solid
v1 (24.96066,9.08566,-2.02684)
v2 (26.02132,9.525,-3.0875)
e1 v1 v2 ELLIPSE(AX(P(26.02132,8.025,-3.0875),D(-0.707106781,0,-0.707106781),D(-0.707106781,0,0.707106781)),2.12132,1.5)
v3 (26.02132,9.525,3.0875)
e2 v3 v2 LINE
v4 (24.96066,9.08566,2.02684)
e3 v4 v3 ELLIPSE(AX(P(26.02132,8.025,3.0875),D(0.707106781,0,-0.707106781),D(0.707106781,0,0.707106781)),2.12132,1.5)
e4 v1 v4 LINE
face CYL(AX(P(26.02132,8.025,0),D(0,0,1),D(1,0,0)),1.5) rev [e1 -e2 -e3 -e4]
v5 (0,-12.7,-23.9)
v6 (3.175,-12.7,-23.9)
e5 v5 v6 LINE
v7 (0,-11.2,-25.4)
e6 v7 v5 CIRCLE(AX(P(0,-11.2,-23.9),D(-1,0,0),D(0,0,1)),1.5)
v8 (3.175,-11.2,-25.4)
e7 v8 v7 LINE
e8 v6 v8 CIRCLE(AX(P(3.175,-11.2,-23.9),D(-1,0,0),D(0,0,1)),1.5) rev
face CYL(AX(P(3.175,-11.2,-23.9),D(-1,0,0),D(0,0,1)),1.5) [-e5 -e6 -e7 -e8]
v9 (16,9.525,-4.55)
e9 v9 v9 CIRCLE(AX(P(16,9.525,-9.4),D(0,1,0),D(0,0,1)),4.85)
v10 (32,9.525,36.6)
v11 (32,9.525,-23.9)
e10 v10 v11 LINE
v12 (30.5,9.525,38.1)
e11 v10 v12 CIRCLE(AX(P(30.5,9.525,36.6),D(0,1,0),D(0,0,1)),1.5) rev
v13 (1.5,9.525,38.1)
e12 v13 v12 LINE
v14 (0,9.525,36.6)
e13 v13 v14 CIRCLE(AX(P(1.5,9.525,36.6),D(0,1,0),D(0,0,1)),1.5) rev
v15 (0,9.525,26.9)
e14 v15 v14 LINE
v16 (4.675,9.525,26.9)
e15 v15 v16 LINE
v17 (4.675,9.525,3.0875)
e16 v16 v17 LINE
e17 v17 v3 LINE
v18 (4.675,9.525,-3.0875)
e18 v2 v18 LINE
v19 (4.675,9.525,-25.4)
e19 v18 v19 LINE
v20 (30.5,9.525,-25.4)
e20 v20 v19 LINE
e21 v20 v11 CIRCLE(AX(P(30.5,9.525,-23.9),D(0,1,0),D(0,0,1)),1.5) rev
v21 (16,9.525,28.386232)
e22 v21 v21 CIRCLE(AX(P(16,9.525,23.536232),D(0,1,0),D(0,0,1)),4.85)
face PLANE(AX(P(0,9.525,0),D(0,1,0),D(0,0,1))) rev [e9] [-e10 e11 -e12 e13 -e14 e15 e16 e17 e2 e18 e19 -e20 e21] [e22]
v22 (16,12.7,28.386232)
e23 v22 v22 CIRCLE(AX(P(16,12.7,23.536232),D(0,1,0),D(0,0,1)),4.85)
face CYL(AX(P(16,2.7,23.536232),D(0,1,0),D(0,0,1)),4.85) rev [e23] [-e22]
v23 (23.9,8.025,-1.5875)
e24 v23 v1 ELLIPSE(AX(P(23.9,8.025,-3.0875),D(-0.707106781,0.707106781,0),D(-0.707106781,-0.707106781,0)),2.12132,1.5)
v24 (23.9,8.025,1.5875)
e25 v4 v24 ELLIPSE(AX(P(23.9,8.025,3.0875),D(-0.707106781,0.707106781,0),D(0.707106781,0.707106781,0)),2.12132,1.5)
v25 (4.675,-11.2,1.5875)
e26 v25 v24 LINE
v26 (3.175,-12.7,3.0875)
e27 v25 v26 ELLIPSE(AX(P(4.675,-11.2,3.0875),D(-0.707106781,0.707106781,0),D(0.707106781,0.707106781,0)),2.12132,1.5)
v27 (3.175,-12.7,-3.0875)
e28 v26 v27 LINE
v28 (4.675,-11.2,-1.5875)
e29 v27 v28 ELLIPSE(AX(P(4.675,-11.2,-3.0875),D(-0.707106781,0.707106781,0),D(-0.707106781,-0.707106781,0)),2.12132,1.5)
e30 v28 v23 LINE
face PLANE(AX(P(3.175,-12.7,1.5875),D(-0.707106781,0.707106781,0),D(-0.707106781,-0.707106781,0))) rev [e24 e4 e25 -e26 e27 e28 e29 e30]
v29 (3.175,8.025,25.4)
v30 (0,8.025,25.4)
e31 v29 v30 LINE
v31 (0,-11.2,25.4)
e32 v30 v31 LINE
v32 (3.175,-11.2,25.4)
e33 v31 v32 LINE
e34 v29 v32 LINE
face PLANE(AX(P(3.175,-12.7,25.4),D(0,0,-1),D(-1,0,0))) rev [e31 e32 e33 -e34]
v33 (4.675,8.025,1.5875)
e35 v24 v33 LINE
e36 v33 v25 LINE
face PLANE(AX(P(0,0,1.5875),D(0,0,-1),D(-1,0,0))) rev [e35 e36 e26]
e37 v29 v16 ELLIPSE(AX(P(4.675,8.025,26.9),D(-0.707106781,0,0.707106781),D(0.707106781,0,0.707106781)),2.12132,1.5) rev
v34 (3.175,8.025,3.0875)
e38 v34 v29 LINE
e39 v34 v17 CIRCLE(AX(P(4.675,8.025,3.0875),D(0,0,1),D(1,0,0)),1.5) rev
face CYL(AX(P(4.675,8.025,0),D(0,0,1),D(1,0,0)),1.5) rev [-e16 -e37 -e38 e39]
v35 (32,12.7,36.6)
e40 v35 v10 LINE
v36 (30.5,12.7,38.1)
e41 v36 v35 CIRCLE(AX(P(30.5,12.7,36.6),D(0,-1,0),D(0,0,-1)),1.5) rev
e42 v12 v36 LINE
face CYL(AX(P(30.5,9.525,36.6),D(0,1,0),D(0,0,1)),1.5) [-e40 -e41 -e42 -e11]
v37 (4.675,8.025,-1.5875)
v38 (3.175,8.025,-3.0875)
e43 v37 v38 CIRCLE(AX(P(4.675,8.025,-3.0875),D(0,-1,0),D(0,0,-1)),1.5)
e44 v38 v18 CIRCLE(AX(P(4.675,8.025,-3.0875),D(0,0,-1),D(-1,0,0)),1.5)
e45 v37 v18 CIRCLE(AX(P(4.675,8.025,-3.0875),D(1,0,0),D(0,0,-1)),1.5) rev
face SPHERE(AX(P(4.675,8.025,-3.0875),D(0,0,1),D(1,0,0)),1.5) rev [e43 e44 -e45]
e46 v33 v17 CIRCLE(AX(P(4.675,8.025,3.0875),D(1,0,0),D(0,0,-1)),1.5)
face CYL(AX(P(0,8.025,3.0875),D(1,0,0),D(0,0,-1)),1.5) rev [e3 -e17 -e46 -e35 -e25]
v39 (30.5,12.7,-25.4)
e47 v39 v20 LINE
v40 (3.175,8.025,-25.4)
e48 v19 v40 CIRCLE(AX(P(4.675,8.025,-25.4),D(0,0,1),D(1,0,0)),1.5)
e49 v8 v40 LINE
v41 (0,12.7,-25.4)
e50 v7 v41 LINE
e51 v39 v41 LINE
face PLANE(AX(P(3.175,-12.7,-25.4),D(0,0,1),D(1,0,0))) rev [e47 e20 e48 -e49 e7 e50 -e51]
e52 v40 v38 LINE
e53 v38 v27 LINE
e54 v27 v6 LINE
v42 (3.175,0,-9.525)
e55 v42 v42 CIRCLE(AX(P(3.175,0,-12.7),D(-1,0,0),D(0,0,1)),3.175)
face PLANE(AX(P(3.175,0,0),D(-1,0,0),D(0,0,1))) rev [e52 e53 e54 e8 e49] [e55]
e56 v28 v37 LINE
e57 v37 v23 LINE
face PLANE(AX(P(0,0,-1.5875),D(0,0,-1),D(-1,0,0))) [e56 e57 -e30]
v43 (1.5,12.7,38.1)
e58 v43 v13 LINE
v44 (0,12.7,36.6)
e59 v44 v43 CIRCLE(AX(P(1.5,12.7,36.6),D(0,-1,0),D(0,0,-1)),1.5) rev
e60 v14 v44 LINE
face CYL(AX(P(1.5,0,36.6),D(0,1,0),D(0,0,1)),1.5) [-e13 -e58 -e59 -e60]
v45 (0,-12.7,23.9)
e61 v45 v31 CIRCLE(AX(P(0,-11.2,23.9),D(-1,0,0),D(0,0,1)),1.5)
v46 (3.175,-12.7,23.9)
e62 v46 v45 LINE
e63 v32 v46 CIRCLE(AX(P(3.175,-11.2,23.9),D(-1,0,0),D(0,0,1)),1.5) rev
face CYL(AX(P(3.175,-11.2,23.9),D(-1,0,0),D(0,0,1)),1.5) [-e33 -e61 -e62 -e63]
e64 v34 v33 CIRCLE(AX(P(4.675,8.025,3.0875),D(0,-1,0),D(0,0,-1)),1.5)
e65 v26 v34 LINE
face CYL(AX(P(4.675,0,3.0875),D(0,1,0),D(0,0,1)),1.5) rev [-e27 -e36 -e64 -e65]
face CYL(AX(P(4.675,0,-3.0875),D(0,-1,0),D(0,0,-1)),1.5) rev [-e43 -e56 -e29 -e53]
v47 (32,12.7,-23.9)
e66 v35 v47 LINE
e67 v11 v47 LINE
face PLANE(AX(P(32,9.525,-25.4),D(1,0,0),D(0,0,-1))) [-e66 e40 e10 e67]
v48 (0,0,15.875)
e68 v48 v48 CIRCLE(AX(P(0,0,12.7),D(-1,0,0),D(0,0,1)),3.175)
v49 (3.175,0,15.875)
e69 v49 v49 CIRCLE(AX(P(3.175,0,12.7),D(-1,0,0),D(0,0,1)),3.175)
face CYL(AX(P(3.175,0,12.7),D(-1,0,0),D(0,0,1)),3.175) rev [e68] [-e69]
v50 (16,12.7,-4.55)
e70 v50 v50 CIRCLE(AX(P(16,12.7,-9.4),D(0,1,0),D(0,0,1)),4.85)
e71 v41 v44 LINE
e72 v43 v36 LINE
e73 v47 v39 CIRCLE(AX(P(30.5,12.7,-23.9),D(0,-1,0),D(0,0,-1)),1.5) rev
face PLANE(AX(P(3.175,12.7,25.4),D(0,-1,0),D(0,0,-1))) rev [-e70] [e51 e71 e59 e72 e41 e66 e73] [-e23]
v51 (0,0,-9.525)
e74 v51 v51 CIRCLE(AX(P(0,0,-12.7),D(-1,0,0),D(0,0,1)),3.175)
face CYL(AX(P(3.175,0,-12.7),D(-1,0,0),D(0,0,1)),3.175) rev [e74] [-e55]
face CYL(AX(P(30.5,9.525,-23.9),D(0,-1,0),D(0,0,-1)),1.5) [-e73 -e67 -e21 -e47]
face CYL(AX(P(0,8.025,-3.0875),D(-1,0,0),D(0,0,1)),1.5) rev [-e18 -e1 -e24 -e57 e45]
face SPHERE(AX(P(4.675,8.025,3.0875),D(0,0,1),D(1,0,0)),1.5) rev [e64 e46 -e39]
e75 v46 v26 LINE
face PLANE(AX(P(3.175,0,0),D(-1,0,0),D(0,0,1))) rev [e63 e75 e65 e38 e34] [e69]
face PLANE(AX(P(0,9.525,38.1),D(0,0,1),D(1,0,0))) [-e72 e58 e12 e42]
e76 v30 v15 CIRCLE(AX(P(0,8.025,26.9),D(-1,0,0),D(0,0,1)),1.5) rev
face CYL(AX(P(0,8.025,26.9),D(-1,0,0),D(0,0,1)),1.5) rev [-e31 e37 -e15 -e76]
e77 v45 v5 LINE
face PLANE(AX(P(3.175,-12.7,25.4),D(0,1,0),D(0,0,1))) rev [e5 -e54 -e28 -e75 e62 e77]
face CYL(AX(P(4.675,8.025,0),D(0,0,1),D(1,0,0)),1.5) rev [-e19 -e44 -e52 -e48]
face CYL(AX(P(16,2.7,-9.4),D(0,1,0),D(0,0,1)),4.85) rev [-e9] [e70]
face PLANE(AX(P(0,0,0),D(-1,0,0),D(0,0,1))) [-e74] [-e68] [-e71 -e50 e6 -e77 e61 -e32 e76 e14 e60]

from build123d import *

# Parameters (mm, degrees)
SKETCH2_W           = 50.8
SKETCH2_H           = 25.4
BOSS_EXTRUDE1_DEPTH = 3.175
SKETCH4_W           = 32
SKETCH4_H           = 63.5
BOSS_EXTRUDE2_DEPTH = 3.175
SKETCH6_R           = 3.175
CUT_EXTRUDE2_DEPTH  = 3.175
BOSS_EXTRUDE3_DEPTH = 1.5875
SKETCH8_R           = 4.85
CUT_EXTRUDE3_DEPTH  = 10
FILLET3_R           = 1.5


with BuildPart() as part:
    # Sketch2 → Boss-Extrude1 (new body)
    with BuildSketch(Plane(origin=(0, 0, 0), x_dir=(0, 0, -1), z_dir=(1, 0, 0))):
        Rectangle(SKETCH2_W, SKETCH2_H)
    extrude(amount=BOSS_EXTRUDE1_DEPTH)

    # Sketch4 → Boss-Extrude2 (add)
    with BuildSketch(Plane(origin=(0, 12.7, 0), x_dir=(1, 0, 0), z_dir=(0, 1, 0))):
        with Locations((16, -6.35)):
            Rectangle(SKETCH4_W, SKETCH4_H)
    extrude(amount=-BOSS_EXTRUDE2_DEPTH)

    # Sketch6 → Cut-Extrude2 (cut)
    with BuildSketch(Plane.ZY):
        with Locations((-12.7, 0)):
            Circle(SKETCH6_R)
        with Locations((12.7, 0)):
            Circle(SKETCH6_R)
    extrude(amount=-CUT_EXTRUDE2_DEPTH, mode=Mode.SUBTRACT)

    # Sketch7 → Boss-Extrude3 (add, symmetric)
    with BuildSketch(Plane.XY):
        Polygon((3.175, -12.7), (25.4, 9.525), (3.175, 9.525), align=None)
    extrude(amount=BOSS_EXTRUDE3_DEPTH, both=True)

    # Sketch8 → Cut-Extrude3 (cut)
    with BuildSketch(Plane(origin=(0, 12.7, 0), x_dir=(1, 0, 0), z_dir=(0, 1, 0))):
        with Locations(Location((16, 9.4, 0), (0, 0, 270))):
            Circle(SKETCH8_R)
        with Locations(Location((16, -23.536231777, 0), (0, 0, 270))):
            Circle(SKETCH8_R)
    extrude(amount=-CUT_EXTRUDE3_DEPTH, mode=Mode.SUBTRACT)

    # Fillet3
    # the kernel refuses this fillet: 1.5 mm, written as the material it adds along each edge
    with BuildSketch(Plane(origin=(4.675, 8.025, 3.0875), x_dir=(0, 0, -1), z_dir=(-1, 0, 0))) as fillet3_piece_1_section:
        Polygon((0, 0), (FILLET3_R, 0), (FILLET3_R, -FILLET3_R), (0, -FILLET3_R), align=None)
    fillet3_piece_1 = extrude(amount=FILLET3_R, mode=Mode.PRIVATE)
    fillet3_piece_1 = fillet3_piece_1 - Plane(origin=(4.675, 8.025, 3.0875), x_dir=(0, -0.7071067811865475, 0.7071067811865475), z_dir=(-1, 0, 0)) * Sphere(FILLET3_R, mode=Mode.PRIVATE)
    add(fillet3_piece_1)
    with BuildSketch(Plane(origin=(4.675, 8.025, -3.0875), x_dir=(-1, 0, 0), z_dir=(0, 0, 1))) as fillet3_piece_2_section:
        Polygon((0, 0), (FILLET3_R, 0), (FILLET3_R, -FILLET3_R), (0, -FILLET3_R), align=None)
    fillet3_piece_2 = extrude(amount=FILLET3_R, mode=Mode.PRIVATE)
    fillet3_piece_2 = fillet3_piece_2 - Plane(origin=(4.675, 8.025, -3.0875), x_dir=(0.7071067811865475, -0.7071067811865475, 0), z_dir=(0, 0, 1)) * Sphere(FILLET3_R, mode=Mode.PRIVATE)
    add(fillet3_piece_2)
    with BuildSketch(Plane(origin=(3.175, 9.525, 25.4), x_dir=(0, -1, 0), z_dir=(-1, 0, 0))) as fillet3_piece_3:
        with BuildLine():
            CenterArc((FILLET3_R, FILLET3_R), FILLET3_R, 180, 90)
            Line((0, FILLET3_R), (0, 0))
            Line((0, 0), (FILLET3_R, 0))
        make_face()
    extrude(amount=3.175)
    with BuildSketch(Plane(origin=(3.175, 9.525, 25.4), x_dir=(0, -1, 0), z_dir=(0, 0, -1)), Plane(origin=(3.175, 9.525, -3.0875), x_dir=(0, -1, 0), z_dir=(0, 0, -1))) as fillet3_piece_4:
        with BuildLine():
            CenterArc((FILLET3_R, -FILLET3_R), FILLET3_R, 90, 90)
            Line((0, -FILLET3_R), (0, 0))
            Line((0, 0), (FILLET3_R, 0))
        make_face()
    extrude(amount=22.3125)
    with BuildSketch(Plane(origin=(29.15, 9.525, -1.5875), x_dir=(0, 0, -1), z_dir=(-1, 0, 0))) as fillet3_piece_5_section:
        with BuildLine():
            CenterArc((FILLET3_R, FILLET3_R), FILLET3_R, 180, 90)
            Line((0, FILLET3_R), (0, 0))
            Line((0, 0), (FILLET3_R, 0))
        make_face()
    fillet3_piece_5 = extrude(amount=24.475, mode=Mode.PRIVATE)
    fillet3_piece_5 = split(fillet3_piece_5, bisect_by=Plane(origin=(19.967902823, 4.092902823, -1.930123153), z_dir=(-0.707106781186549, 0.707106781186546, 0)), keep=Keep.TOP, mode=Mode.PRIVATE)
    add(fillet3_piece_5)
    with BuildSketch(Plane(origin=(25.4, 9.525, -1.5875), x_dir=(-0.7071067811865489, -0.7071067811865461, 0), z_dir=(0, 0, 1))) as fillet3_piece_6:
        with BuildLine():
            CenterArc((FILLET3_R * 0.414213562373, FILLET3_R), FILLET3_R, 225, 45)
            Line((-FILLET3_R * 0.292893218813, FILLET3_R * 0.292893218813), (0, 0))
            Line((0, 0), (FILLET3_R * 0.414213562373, 0))
        make_face()
    extrude(amount=3.175)
    with BuildSketch(Plane(origin=(3.175, 8.025, -1.5875), x_dir=(0, 0, -1), z_dir=(0, -1, 0))) as fillet3_piece_7_section:
        with BuildLine():
            CenterArc((FILLET3_R, FILLET3_R), FILLET3_R, 180, 90)
            Line((0, FILLET3_R), (0, 0))
            Line((0, 0), (FILLET3_R, 0))
        make_face()
    fillet3_piece_7 = extrude(amount=20.725, mode=Mode.PRIVATE)
    fillet3_piece_7 = split(fillet3_piece_7, bisect_by=Plane(origin=(8.60741784, -7.26758216, -1.930100054), z_dir=(-0.707106781186549, 0.707106781186546, 0)), keep=Keep.TOP, mode=Mode.PRIVATE)
    add(fillet3_piece_7)
    with BuildSketch(Plane(origin=(29.15, 9.525, 1.5875), x_dir=(0, 0, 1), z_dir=(-1, 0, 0))) as fillet3_piece_8_section:
        with BuildLine():
            CenterArc((FILLET3_R, -FILLET3_R), FILLET3_R, 90, 90)
            Line((0, -FILLET3_R), (0, 0))
            Line((0, 0), (FILLET3_R, 0))
        make_face()
    fillet3_piece_8 = extrude(amount=24.475, mode=Mode.PRIVATE)
    fillet3_piece_8 = split(fillet3_piece_8, bisect_by=Plane(origin=(19.967902823, 4.092902823, 1.930123153), z_dir=(-0.707106781186549, 0.707106781186546, 0)), keep=Keep.TOP, mode=Mode.PRIVATE)
    add(fillet3_piece_8)
    with BuildSketch(Plane(origin=(3.175, 8.025, 1.5875), x_dir=(0, 0, 1), z_dir=(0, -1, 0))) as fillet3_piece_9_section:
        with BuildLine():
            CenterArc((FILLET3_R, -FILLET3_R), FILLET3_R, 90, 90)
            Line((0, -FILLET3_R), (0, 0))
            Line((0, 0), (FILLET3_R, 0))
        make_face()
    fillet3_piece_9 = extrude(amount=20.725, mode=Mode.PRIVATE)
    fillet3_piece_9 = split(fillet3_piece_9, bisect_by=Plane(origin=(8.60741784, -7.26758216, 1.930100054), z_dir=(-0.707106781186549, 0.707106781186546, 0)), keep=Keep.TOP, mode=Mode.PRIVATE)
    add(fillet3_piece_9)
    with BuildSketch(Plane(origin=(6.925, 9.525, 25.4), x_dir=(0, -1, 0), z_dir=(-1, 0, 0))) as fillet3_piece_10a_section:
        with BuildLine():
            CenterArc((FILLET3_R, FILLET3_R), FILLET3_R, 180, 90)
            Line((0, FILLET3_R), (0, 0))
            Line((0, 0), (FILLET3_R, 0))
        make_face()
    fillet3_piece_10a = extrude(amount=6.925, mode=Mode.PRIVATE)
    fillet3_piece_10a = split(fillet3_piece_10a, bisect_by=Plane(origin=(3.175, 9.185407329, 25.739592671), z_dir=(1, 0, 0)), keep=Keep.TOP, mode=Mode.PRIVATE)
    with BuildSketch(Plane(origin=(3.175, 9.525, 29.15), x_dir=(0, -1, 0), z_dir=(0, 0, -1))) as fillet3_piece_10b_section:
        with BuildLine():
            CenterArc((FILLET3_R, -FILLET3_R), FILLET3_R, 90, 90)
            Line((0, -FILLET3_R), (0, 0))
            Line((0, 0), (FILLET3_R, 0))
        make_face()
    fillet3_piece_10b = extrude(amount=26.0625, mode=Mode.PRIVATE)
    fillet3_piece_10b = split(fillet3_piece_10b, bisect_by=Plane(origin=(3.514592671, 9.185407329, 25.4), z_dir=(0, 0, 1)), keep=Keep.TOP, mode=Mode.PRIVATE)
    fillet3_piece_10 = fillet3_piece_10a & fillet3_piece_10b
    add(fillet3_piece_10)
    with BuildSketch(Plane(origin=(25.4, 9.525, -3.140800859), x_dir=(-0.7071067811865446, -0.7071067811865503, 0), z_dir=(0, 0, 1))) as fillet3_piece_11a_section:
        with BuildLine():
            CenterArc((FILLET3_R * 0.414213562373, FILLET3_R), FILLET3_R, 225, 45)
            Line((-FILLET3_R * 0.292893218813, FILLET3_R * 0.292893218813), (0, 0))
            Line((0, 0), (FILLET3_R * 0.414213562373, 0))
        make_face()
    fillet3_piece_11a = extrude(amount=4.728300859, mode=Mode.PRIVATE)
    fillet3_piece_11a = split(fillet3_piece_11a, bisect_by=Plane(origin=(25.438403899, 9.432284787, -1.5875), z_dir=(0, 0, -1)), keep=Keep.TOP, mode=Mode.PRIVATE)
    with BuildSketch(Plane(origin=(29.15, 9.525, -1.5875), x_dir=(0, 0, -1), z_dir=(-1, 0, 0))) as fillet3_piece_11b_section:
        with BuildLine():
            CenterArc((FILLET3_R, FILLET3_R), FILLET3_R, 180, 90)
            Line((0, FILLET3_R), (0, 0))
            Line((0, 0), (FILLET3_R, 0))
        make_face()
    fillet3_piece_11b = extrude(amount=24.475, mode=Mode.PRIVATE)
    fillet3_piece_11b = split(fillet3_piece_11b, bisect_by=Plane(origin=(26.063627713, 10.188627713, -1.91198662), z_dir=(0.707106781186549, -0.707106781186546, 0)), keep=Keep.TOP, mode=Mode.PRIVATE)
    fillet3_piece_11 = fillet3_piece_11a & fillet3_piece_11b
    add(fillet3_piece_11)
    with BuildSketch(Plane(origin=(25.4, 9.525, -1.5875), x_dir=(-0.7071067811865489, -0.7071067811865461, 0), z_dir=(0, 0, 1))) as fillet3_piece_12a_section:
        with BuildLine():
            CenterArc((FILLET3_R * 0.414213562373, FILLET3_R), FILLET3_R, 225, 45)
            Line((-FILLET3_R * 0.292893218813, FILLET3_R * 0.292893218813), (0, 0))
            Line((0, 0), (FILLET3_R * 0.414213562373, 0))
        make_face()
    fillet3_piece_12a = extrude(amount=4.728300859, mode=Mode.PRIVATE)
    fillet3_piece_12a = split(fillet3_piece_12a, bisect_by=Plane(origin=(25.438403899, 9.432284787, 1.5875), z_dir=(0, 0, 1)), keep=Keep.TOP, mode=Mode.PRIVATE)
    with BuildSketch(Plane(origin=(29.15, 9.525, 1.5875), x_dir=(0, 0, 1), z_dir=(-1, 0, 0))) as fillet3_piece_12b_section:
        with BuildLine():
            CenterArc((FILLET3_R, -FILLET3_R), FILLET3_R, 90, 90)
            Line((0, -FILLET3_R), (0, 0))
            Line((0, 0), (FILLET3_R, 0))
        make_face()
    fillet3_piece_12b = extrude(amount=24.475, mode=Mode.PRIVATE)
    fillet3_piece_12b = split(fillet3_piece_12b, bisect_by=Plane(origin=(26.063627713, 10.188627713, 1.91198662), z_dir=(0.707106781186549, -0.707106781186546, 0)), keep=Keep.TOP, mode=Mode.PRIVATE)
    fillet3_piece_12 = fillet3_piece_12a & fillet3_piece_12b
    add(fillet3_piece_12)
    # the kernel refuses this fillet: 1.5 mm, written as the material it takes off along each edge
    with BuildSketch(Plane(origin=(0, 16.45, 38.1), x_dir=(0, 0, -1), z_dir=(0, -1, 0)), Plane(origin=(32, 16.45, -25.4), x_dir=(0, 0, 1), z_dir=(0, -1, 0)), Plane(origin=(-3.75, -12.7, 25.4), x_dir=(0, 0, -1), z_dir=(1, 0, 0))) as fillet3_2_piece_1:
        with BuildLine():
            CenterArc((FILLET3_R, FILLET3_R), FILLET3_R, 180, 90)
            Line((0, FILLET3_R), (0, 0))
            Line((0, 0), (FILLET3_R, 0))
        make_face()
    extrude(amount=10.675, mode=Mode.SUBTRACT)
    with BuildSketch(Plane(origin=(32, 16.45, 38.1), x_dir=(0, 0, -1), z_dir=(0, -1, 0)), Plane(origin=(-3.75, -12.7, -25.4), x_dir=(0, 0, 1), z_dir=(1, 0, 0))) as fillet3_2_piece_2:
        with BuildLine():
            CenterArc((FILLET3_R, -FILLET3_R), FILLET3_R, 90, 90)
            Line((0, -FILLET3_R), (0, 0))
            Line((0, 0), (FILLET3_R, 0))
        make_face()
    extrude(amount=10.675, mode=Mode.SUBTRACT)


solid = part.part
